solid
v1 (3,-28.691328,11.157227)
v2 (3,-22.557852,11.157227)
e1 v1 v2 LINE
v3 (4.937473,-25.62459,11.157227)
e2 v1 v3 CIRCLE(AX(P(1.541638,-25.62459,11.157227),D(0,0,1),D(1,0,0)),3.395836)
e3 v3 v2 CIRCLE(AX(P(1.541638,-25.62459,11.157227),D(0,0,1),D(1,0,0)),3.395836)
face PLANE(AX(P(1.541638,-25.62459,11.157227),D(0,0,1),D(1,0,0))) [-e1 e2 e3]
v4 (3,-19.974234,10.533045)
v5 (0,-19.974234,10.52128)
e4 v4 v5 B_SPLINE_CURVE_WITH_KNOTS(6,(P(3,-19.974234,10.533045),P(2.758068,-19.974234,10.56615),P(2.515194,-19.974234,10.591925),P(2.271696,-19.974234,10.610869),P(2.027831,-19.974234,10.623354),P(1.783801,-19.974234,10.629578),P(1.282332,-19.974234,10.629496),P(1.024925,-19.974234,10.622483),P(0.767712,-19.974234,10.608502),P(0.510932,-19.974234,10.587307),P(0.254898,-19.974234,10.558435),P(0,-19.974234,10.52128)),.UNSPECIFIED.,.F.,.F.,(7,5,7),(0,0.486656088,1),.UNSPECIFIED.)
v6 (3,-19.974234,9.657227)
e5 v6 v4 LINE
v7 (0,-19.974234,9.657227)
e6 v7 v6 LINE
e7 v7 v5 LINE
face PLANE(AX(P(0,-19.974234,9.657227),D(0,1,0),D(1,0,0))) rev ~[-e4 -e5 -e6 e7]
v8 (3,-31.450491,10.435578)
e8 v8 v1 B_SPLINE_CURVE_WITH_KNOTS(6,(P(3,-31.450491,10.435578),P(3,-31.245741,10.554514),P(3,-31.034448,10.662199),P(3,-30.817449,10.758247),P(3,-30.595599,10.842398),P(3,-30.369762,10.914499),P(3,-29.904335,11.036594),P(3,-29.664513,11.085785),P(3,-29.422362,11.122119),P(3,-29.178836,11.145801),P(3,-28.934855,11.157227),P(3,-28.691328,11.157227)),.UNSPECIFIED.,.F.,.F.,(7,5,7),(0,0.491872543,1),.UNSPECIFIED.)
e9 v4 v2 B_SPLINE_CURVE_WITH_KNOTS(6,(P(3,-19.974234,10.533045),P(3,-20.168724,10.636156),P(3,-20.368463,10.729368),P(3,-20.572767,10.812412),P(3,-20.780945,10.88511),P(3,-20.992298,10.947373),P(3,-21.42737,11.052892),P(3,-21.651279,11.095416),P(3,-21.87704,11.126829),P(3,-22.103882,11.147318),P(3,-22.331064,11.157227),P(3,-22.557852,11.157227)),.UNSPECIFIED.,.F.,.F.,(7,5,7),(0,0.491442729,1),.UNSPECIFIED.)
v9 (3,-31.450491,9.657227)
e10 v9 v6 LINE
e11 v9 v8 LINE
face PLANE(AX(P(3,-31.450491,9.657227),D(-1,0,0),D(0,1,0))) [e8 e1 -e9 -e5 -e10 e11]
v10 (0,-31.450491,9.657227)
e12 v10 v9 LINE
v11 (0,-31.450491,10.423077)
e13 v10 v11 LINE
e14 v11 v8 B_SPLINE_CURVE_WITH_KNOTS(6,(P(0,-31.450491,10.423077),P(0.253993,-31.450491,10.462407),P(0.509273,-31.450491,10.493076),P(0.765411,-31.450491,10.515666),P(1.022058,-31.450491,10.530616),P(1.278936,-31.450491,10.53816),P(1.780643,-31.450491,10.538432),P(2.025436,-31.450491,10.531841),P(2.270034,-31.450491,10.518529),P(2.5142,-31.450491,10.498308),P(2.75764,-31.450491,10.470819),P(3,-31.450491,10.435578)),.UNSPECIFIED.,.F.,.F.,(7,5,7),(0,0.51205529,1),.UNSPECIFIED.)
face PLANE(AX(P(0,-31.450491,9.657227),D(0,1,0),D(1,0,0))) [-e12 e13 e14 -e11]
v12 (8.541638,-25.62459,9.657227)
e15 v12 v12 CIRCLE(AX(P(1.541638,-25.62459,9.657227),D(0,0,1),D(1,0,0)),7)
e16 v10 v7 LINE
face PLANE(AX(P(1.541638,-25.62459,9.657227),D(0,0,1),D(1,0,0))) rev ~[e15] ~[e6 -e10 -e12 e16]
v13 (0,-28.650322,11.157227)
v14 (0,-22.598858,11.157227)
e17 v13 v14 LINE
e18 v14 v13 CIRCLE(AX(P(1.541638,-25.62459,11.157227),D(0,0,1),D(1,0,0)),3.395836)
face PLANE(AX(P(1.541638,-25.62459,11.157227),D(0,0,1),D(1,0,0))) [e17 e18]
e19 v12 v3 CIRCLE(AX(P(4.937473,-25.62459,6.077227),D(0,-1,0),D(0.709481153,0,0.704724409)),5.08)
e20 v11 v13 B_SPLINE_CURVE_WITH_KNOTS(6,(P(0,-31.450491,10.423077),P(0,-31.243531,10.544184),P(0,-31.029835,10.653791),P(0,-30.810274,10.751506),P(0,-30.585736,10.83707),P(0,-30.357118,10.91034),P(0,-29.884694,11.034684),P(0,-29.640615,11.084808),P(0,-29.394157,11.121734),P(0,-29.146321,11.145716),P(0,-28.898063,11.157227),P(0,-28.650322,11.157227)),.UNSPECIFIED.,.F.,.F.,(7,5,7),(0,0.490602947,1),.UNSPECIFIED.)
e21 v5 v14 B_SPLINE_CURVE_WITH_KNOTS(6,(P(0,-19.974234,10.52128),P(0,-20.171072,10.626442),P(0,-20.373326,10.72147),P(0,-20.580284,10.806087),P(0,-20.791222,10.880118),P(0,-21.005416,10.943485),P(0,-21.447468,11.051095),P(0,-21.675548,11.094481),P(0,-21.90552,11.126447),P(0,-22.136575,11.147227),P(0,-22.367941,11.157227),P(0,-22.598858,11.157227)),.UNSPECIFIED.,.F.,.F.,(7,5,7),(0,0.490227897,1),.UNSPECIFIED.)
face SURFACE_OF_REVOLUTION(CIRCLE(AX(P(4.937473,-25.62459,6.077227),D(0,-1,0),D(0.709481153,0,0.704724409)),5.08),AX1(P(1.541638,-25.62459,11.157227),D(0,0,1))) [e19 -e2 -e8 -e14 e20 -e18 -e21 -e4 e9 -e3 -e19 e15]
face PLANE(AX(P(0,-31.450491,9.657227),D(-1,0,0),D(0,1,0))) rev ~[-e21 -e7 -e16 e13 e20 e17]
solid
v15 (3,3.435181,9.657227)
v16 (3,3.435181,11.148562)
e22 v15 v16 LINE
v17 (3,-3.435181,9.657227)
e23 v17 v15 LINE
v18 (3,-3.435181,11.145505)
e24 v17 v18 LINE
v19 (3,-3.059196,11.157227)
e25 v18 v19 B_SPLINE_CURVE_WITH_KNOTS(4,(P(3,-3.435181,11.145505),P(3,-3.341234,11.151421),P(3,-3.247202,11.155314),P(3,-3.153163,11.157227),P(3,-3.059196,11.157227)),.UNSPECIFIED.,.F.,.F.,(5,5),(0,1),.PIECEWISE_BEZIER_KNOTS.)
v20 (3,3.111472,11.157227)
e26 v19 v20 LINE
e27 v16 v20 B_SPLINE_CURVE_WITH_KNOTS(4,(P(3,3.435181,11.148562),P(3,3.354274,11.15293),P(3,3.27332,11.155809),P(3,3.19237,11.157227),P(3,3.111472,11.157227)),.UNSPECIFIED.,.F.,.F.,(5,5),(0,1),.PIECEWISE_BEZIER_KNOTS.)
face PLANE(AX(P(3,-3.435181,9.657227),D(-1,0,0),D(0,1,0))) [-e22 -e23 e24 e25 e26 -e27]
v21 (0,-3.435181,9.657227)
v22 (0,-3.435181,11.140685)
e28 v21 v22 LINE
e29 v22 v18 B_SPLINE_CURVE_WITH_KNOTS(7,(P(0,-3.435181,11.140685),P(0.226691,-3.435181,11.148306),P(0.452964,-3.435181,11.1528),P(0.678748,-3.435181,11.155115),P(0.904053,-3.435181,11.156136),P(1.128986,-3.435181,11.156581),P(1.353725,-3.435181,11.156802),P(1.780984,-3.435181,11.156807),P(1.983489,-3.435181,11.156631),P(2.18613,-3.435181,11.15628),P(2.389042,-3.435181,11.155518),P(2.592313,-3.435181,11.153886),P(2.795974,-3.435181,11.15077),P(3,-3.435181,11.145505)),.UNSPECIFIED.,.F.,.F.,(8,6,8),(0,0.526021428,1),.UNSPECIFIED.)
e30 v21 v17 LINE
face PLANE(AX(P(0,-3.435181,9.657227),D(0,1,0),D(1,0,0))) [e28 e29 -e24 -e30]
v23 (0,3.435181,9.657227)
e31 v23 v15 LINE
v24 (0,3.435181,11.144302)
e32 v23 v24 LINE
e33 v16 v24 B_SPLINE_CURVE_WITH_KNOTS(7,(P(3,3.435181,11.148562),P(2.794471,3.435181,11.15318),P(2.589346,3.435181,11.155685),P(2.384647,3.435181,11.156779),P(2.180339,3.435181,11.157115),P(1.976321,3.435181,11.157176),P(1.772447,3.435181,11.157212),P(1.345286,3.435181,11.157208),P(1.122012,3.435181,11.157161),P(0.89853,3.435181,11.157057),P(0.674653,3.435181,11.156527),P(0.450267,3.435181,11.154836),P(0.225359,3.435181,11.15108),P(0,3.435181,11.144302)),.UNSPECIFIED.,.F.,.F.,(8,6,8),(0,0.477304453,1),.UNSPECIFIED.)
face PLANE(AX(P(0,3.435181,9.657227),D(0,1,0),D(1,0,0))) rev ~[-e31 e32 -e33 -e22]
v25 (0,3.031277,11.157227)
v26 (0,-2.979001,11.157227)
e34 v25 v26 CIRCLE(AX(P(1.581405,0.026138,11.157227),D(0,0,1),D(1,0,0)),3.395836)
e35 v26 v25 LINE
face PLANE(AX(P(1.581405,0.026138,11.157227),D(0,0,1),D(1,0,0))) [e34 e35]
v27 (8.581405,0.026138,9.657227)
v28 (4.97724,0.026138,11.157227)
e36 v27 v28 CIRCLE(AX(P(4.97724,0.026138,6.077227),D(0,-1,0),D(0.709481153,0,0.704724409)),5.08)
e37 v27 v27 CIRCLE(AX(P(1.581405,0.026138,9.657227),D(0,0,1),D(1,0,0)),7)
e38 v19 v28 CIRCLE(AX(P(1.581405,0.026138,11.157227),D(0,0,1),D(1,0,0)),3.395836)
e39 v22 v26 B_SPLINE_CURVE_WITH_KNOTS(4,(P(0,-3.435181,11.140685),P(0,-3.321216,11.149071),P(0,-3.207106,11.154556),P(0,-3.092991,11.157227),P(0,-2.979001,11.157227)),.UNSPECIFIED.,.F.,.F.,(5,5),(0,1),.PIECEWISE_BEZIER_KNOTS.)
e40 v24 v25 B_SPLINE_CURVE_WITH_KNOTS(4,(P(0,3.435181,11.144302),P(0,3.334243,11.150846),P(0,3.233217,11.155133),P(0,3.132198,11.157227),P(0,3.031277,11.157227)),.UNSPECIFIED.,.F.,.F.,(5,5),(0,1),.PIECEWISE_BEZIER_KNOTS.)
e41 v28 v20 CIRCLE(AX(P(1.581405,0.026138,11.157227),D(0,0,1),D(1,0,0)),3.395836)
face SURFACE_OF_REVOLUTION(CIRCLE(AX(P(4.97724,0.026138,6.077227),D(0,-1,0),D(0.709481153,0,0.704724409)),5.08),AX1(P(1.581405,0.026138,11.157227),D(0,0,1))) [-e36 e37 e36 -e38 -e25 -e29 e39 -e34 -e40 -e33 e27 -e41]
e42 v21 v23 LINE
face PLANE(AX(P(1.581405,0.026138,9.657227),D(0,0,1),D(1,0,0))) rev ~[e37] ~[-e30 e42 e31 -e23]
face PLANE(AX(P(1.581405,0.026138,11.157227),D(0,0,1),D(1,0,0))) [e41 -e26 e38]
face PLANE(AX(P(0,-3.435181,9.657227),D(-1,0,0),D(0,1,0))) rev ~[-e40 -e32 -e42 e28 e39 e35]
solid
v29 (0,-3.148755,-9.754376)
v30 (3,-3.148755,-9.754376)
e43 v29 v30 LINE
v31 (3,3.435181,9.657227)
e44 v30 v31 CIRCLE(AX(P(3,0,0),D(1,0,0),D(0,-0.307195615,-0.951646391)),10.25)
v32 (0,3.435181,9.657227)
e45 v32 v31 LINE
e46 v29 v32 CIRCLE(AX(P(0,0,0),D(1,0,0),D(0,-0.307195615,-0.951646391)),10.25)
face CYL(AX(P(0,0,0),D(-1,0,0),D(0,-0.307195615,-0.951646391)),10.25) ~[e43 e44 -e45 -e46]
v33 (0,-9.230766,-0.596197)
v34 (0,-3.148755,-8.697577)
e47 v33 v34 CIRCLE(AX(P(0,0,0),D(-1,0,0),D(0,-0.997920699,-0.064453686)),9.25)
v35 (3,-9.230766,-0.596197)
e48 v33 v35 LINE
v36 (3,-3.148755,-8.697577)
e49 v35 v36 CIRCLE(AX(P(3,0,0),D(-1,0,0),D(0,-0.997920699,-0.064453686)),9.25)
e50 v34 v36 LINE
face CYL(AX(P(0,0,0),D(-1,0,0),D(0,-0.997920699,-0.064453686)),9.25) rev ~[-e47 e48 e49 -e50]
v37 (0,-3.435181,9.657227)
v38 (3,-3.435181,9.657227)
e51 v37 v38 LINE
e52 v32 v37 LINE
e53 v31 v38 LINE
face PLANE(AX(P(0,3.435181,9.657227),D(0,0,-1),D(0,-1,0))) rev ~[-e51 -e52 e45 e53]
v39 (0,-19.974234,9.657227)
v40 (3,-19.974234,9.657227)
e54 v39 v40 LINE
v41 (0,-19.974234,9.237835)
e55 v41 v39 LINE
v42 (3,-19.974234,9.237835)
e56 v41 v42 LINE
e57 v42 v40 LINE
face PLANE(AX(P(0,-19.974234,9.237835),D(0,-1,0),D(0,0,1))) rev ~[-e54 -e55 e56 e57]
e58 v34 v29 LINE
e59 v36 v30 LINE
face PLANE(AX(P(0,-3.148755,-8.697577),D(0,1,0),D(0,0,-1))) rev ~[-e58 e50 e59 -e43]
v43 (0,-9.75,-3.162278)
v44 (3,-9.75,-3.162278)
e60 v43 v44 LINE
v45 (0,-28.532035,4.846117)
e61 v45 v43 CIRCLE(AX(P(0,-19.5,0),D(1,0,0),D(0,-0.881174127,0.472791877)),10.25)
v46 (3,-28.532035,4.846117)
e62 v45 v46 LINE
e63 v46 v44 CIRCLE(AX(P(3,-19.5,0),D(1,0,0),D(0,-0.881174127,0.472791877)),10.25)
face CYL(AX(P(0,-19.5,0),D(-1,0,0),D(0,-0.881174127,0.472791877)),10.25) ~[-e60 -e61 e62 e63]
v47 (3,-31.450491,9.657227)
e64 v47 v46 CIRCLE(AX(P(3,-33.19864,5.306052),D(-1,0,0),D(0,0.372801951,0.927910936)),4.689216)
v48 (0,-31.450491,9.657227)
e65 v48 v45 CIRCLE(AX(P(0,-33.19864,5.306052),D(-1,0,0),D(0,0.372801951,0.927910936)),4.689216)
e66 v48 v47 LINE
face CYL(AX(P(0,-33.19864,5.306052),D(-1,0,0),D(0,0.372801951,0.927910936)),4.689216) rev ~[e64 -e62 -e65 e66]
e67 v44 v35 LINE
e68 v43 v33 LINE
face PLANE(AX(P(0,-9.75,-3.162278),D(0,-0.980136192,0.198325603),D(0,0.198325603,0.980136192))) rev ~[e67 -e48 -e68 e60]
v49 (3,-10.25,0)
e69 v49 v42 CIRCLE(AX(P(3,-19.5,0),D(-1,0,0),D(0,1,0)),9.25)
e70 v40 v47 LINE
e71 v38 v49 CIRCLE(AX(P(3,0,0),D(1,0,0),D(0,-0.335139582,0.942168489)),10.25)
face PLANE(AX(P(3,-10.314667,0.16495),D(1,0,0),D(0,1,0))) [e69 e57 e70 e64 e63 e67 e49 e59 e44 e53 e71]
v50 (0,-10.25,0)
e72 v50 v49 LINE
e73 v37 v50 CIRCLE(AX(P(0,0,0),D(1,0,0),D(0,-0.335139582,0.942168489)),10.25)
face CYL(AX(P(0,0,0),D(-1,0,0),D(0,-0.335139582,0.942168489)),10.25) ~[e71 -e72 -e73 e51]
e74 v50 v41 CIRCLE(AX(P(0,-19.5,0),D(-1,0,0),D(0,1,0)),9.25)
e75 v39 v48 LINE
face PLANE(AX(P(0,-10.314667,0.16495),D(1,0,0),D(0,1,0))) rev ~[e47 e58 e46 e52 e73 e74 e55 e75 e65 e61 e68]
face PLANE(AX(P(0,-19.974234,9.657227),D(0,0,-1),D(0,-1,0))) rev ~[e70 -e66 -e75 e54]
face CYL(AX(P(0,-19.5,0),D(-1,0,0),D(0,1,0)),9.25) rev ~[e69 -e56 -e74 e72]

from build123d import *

# Parameters (mm, degrees)
F1_DEPTH = 3
F2_R     = 7
F2_W     = 3
F2_H     = 11.476257816
F3_DEPTH = 1.5
F5_R     = 7
F5_W     = 3
F5_H     = 6.8703614243
F6_DEPTH = 1.5


# Not quite as in the source:
# - a fillet or chamfer that OpenCascade refuses, or shapes differently, is made with other operations: its cross-section is extruded or revolved along the edge and cut away or added


with BuildPart() as f1:
    # F0 (on Right) → F1 (new body)
    with BuildSketch(Plane.YZ):
        with BuildLine():
            ThreePointArc((-9.23076647, -0.5961965923), (7.3973798388, 5.5534918313), (-3.1487550555, -8.697576766))
            Line((-3.1487550555, -8.697576766), (-3.1487550555, -9.7543755105))
            ThreePointArc((-3.1487550555, -9.7543755105), (9.7068577817, -3.2923262302), (3.4351807121, 9.6572270075))
            Line((3.4351807121, 9.6572270075), (-3.4351807121, 9.6572270075))
            ThreePointArc((-3.4351807121, 9.6572270075), (-8.3747567815, 5.9098180048), (-10.25, 0))
            ThreePointArc((-10.25, 0), (-25.8708649083, -6.7063089937), (-19.9742335826, 9.2378353801))
            Line((-19.9742335826, 9.2378353801), (-19.9742335826, 9.6572270075))
            Line((-19.9742335826, 9.6572270075), (-22.9351807121, 9.6572270075))
            Line((-22.9351807121, 9.6572270075), (-31.4504913986, 9.6572270075))
            ThreePointArc((-31.4504913986, 9.6572270075), (-29.1894054573, 7.7380849014), (-28.5320347977, 4.8461167354))
            ThreePointArc((-28.5320347977, 4.8461167354), (-23.5202566717, -9.4286815777), (-9.75, -3.1622776602))
            Line((-9.75, -3.1622776602), (-9.23076647, -0.5961965923))
        make_face()
    extrude(amount=F1_DEPTH)


with BuildPart() as f3:
    # F2 (on face) → F3 (new body)
    with BuildSketch(Plane.XY.offset(9.6572270075)):
        with Locations((1.5416375827, -25.6245899945)):
            Circle(F2_R)
        with Locations((1.5, -25.7123624906)):
            Rectangle(F2_W, F2_H, mode=Mode.SUBTRACT)
    extrude(amount=F3_DEPTH)

    # F4: fillet of radius 5.08 on 1 edges, made by hand

    # F4_s1 → F4_t2 (revolve, cut)
    with BuildSketch(Plane.XZ.offset(25.6245899945)):
        with BuildLine():
            ThreePointArc((8.5416375827, 9.6572270075), (6.8893954541, 10.7672589904), (4.9374733245, 11.1572270075))
            Line((4.9374733245, 11.1572270075), (8.5416375827, 11.1572270075))
            Line((8.5416375827, 11.1572270075), (8.5416375827, 9.6572270075))
        make_face()
    revolve(axis=Axis((1.5416375827, -25.6245899945, 11.1572270075), (0, 0, 1)), mode=Mode.SUBTRACT)


with BuildPart() as f6:
    # F5 (on face) → F6 (new body)
    with BuildSketch(Plane.XY.offset(9.6572270075)):
        with Locations((1.581404591, 0.0261381756)):
            Circle(F5_R)
        with Locations((1.5, 0)):
            Rectangle(F5_W, F5_H, mode=Mode.SUBTRACT)
    extrude(amount=F6_DEPTH)

    # F7: fillet of radius 5.08 on 1 edges, made by hand

    # F7_s1 → F7_t2 (revolve, cut)
    with BuildSketch(Plane.XZ.offset(-0.0261381756)):
        with BuildLine():
            ThreePointArc((8.581404591, 9.6572270075), (6.9291624624, 10.7672589904), (4.9772403328, 11.1572270075))
            Line((4.9772403328, 11.1572270075), (8.581404591, 11.1572270075))
            Line((8.581404591, 11.1572270075), (8.581404591, 9.6572270075))
        make_face()
    revolve(axis=Axis((1.581404591, 0.0261381756, 11.1572270075), (0, 0, 1)), mode=Mode.SUBTRACT)


solid = Compound([f1.part, f3.part, f6.part])
